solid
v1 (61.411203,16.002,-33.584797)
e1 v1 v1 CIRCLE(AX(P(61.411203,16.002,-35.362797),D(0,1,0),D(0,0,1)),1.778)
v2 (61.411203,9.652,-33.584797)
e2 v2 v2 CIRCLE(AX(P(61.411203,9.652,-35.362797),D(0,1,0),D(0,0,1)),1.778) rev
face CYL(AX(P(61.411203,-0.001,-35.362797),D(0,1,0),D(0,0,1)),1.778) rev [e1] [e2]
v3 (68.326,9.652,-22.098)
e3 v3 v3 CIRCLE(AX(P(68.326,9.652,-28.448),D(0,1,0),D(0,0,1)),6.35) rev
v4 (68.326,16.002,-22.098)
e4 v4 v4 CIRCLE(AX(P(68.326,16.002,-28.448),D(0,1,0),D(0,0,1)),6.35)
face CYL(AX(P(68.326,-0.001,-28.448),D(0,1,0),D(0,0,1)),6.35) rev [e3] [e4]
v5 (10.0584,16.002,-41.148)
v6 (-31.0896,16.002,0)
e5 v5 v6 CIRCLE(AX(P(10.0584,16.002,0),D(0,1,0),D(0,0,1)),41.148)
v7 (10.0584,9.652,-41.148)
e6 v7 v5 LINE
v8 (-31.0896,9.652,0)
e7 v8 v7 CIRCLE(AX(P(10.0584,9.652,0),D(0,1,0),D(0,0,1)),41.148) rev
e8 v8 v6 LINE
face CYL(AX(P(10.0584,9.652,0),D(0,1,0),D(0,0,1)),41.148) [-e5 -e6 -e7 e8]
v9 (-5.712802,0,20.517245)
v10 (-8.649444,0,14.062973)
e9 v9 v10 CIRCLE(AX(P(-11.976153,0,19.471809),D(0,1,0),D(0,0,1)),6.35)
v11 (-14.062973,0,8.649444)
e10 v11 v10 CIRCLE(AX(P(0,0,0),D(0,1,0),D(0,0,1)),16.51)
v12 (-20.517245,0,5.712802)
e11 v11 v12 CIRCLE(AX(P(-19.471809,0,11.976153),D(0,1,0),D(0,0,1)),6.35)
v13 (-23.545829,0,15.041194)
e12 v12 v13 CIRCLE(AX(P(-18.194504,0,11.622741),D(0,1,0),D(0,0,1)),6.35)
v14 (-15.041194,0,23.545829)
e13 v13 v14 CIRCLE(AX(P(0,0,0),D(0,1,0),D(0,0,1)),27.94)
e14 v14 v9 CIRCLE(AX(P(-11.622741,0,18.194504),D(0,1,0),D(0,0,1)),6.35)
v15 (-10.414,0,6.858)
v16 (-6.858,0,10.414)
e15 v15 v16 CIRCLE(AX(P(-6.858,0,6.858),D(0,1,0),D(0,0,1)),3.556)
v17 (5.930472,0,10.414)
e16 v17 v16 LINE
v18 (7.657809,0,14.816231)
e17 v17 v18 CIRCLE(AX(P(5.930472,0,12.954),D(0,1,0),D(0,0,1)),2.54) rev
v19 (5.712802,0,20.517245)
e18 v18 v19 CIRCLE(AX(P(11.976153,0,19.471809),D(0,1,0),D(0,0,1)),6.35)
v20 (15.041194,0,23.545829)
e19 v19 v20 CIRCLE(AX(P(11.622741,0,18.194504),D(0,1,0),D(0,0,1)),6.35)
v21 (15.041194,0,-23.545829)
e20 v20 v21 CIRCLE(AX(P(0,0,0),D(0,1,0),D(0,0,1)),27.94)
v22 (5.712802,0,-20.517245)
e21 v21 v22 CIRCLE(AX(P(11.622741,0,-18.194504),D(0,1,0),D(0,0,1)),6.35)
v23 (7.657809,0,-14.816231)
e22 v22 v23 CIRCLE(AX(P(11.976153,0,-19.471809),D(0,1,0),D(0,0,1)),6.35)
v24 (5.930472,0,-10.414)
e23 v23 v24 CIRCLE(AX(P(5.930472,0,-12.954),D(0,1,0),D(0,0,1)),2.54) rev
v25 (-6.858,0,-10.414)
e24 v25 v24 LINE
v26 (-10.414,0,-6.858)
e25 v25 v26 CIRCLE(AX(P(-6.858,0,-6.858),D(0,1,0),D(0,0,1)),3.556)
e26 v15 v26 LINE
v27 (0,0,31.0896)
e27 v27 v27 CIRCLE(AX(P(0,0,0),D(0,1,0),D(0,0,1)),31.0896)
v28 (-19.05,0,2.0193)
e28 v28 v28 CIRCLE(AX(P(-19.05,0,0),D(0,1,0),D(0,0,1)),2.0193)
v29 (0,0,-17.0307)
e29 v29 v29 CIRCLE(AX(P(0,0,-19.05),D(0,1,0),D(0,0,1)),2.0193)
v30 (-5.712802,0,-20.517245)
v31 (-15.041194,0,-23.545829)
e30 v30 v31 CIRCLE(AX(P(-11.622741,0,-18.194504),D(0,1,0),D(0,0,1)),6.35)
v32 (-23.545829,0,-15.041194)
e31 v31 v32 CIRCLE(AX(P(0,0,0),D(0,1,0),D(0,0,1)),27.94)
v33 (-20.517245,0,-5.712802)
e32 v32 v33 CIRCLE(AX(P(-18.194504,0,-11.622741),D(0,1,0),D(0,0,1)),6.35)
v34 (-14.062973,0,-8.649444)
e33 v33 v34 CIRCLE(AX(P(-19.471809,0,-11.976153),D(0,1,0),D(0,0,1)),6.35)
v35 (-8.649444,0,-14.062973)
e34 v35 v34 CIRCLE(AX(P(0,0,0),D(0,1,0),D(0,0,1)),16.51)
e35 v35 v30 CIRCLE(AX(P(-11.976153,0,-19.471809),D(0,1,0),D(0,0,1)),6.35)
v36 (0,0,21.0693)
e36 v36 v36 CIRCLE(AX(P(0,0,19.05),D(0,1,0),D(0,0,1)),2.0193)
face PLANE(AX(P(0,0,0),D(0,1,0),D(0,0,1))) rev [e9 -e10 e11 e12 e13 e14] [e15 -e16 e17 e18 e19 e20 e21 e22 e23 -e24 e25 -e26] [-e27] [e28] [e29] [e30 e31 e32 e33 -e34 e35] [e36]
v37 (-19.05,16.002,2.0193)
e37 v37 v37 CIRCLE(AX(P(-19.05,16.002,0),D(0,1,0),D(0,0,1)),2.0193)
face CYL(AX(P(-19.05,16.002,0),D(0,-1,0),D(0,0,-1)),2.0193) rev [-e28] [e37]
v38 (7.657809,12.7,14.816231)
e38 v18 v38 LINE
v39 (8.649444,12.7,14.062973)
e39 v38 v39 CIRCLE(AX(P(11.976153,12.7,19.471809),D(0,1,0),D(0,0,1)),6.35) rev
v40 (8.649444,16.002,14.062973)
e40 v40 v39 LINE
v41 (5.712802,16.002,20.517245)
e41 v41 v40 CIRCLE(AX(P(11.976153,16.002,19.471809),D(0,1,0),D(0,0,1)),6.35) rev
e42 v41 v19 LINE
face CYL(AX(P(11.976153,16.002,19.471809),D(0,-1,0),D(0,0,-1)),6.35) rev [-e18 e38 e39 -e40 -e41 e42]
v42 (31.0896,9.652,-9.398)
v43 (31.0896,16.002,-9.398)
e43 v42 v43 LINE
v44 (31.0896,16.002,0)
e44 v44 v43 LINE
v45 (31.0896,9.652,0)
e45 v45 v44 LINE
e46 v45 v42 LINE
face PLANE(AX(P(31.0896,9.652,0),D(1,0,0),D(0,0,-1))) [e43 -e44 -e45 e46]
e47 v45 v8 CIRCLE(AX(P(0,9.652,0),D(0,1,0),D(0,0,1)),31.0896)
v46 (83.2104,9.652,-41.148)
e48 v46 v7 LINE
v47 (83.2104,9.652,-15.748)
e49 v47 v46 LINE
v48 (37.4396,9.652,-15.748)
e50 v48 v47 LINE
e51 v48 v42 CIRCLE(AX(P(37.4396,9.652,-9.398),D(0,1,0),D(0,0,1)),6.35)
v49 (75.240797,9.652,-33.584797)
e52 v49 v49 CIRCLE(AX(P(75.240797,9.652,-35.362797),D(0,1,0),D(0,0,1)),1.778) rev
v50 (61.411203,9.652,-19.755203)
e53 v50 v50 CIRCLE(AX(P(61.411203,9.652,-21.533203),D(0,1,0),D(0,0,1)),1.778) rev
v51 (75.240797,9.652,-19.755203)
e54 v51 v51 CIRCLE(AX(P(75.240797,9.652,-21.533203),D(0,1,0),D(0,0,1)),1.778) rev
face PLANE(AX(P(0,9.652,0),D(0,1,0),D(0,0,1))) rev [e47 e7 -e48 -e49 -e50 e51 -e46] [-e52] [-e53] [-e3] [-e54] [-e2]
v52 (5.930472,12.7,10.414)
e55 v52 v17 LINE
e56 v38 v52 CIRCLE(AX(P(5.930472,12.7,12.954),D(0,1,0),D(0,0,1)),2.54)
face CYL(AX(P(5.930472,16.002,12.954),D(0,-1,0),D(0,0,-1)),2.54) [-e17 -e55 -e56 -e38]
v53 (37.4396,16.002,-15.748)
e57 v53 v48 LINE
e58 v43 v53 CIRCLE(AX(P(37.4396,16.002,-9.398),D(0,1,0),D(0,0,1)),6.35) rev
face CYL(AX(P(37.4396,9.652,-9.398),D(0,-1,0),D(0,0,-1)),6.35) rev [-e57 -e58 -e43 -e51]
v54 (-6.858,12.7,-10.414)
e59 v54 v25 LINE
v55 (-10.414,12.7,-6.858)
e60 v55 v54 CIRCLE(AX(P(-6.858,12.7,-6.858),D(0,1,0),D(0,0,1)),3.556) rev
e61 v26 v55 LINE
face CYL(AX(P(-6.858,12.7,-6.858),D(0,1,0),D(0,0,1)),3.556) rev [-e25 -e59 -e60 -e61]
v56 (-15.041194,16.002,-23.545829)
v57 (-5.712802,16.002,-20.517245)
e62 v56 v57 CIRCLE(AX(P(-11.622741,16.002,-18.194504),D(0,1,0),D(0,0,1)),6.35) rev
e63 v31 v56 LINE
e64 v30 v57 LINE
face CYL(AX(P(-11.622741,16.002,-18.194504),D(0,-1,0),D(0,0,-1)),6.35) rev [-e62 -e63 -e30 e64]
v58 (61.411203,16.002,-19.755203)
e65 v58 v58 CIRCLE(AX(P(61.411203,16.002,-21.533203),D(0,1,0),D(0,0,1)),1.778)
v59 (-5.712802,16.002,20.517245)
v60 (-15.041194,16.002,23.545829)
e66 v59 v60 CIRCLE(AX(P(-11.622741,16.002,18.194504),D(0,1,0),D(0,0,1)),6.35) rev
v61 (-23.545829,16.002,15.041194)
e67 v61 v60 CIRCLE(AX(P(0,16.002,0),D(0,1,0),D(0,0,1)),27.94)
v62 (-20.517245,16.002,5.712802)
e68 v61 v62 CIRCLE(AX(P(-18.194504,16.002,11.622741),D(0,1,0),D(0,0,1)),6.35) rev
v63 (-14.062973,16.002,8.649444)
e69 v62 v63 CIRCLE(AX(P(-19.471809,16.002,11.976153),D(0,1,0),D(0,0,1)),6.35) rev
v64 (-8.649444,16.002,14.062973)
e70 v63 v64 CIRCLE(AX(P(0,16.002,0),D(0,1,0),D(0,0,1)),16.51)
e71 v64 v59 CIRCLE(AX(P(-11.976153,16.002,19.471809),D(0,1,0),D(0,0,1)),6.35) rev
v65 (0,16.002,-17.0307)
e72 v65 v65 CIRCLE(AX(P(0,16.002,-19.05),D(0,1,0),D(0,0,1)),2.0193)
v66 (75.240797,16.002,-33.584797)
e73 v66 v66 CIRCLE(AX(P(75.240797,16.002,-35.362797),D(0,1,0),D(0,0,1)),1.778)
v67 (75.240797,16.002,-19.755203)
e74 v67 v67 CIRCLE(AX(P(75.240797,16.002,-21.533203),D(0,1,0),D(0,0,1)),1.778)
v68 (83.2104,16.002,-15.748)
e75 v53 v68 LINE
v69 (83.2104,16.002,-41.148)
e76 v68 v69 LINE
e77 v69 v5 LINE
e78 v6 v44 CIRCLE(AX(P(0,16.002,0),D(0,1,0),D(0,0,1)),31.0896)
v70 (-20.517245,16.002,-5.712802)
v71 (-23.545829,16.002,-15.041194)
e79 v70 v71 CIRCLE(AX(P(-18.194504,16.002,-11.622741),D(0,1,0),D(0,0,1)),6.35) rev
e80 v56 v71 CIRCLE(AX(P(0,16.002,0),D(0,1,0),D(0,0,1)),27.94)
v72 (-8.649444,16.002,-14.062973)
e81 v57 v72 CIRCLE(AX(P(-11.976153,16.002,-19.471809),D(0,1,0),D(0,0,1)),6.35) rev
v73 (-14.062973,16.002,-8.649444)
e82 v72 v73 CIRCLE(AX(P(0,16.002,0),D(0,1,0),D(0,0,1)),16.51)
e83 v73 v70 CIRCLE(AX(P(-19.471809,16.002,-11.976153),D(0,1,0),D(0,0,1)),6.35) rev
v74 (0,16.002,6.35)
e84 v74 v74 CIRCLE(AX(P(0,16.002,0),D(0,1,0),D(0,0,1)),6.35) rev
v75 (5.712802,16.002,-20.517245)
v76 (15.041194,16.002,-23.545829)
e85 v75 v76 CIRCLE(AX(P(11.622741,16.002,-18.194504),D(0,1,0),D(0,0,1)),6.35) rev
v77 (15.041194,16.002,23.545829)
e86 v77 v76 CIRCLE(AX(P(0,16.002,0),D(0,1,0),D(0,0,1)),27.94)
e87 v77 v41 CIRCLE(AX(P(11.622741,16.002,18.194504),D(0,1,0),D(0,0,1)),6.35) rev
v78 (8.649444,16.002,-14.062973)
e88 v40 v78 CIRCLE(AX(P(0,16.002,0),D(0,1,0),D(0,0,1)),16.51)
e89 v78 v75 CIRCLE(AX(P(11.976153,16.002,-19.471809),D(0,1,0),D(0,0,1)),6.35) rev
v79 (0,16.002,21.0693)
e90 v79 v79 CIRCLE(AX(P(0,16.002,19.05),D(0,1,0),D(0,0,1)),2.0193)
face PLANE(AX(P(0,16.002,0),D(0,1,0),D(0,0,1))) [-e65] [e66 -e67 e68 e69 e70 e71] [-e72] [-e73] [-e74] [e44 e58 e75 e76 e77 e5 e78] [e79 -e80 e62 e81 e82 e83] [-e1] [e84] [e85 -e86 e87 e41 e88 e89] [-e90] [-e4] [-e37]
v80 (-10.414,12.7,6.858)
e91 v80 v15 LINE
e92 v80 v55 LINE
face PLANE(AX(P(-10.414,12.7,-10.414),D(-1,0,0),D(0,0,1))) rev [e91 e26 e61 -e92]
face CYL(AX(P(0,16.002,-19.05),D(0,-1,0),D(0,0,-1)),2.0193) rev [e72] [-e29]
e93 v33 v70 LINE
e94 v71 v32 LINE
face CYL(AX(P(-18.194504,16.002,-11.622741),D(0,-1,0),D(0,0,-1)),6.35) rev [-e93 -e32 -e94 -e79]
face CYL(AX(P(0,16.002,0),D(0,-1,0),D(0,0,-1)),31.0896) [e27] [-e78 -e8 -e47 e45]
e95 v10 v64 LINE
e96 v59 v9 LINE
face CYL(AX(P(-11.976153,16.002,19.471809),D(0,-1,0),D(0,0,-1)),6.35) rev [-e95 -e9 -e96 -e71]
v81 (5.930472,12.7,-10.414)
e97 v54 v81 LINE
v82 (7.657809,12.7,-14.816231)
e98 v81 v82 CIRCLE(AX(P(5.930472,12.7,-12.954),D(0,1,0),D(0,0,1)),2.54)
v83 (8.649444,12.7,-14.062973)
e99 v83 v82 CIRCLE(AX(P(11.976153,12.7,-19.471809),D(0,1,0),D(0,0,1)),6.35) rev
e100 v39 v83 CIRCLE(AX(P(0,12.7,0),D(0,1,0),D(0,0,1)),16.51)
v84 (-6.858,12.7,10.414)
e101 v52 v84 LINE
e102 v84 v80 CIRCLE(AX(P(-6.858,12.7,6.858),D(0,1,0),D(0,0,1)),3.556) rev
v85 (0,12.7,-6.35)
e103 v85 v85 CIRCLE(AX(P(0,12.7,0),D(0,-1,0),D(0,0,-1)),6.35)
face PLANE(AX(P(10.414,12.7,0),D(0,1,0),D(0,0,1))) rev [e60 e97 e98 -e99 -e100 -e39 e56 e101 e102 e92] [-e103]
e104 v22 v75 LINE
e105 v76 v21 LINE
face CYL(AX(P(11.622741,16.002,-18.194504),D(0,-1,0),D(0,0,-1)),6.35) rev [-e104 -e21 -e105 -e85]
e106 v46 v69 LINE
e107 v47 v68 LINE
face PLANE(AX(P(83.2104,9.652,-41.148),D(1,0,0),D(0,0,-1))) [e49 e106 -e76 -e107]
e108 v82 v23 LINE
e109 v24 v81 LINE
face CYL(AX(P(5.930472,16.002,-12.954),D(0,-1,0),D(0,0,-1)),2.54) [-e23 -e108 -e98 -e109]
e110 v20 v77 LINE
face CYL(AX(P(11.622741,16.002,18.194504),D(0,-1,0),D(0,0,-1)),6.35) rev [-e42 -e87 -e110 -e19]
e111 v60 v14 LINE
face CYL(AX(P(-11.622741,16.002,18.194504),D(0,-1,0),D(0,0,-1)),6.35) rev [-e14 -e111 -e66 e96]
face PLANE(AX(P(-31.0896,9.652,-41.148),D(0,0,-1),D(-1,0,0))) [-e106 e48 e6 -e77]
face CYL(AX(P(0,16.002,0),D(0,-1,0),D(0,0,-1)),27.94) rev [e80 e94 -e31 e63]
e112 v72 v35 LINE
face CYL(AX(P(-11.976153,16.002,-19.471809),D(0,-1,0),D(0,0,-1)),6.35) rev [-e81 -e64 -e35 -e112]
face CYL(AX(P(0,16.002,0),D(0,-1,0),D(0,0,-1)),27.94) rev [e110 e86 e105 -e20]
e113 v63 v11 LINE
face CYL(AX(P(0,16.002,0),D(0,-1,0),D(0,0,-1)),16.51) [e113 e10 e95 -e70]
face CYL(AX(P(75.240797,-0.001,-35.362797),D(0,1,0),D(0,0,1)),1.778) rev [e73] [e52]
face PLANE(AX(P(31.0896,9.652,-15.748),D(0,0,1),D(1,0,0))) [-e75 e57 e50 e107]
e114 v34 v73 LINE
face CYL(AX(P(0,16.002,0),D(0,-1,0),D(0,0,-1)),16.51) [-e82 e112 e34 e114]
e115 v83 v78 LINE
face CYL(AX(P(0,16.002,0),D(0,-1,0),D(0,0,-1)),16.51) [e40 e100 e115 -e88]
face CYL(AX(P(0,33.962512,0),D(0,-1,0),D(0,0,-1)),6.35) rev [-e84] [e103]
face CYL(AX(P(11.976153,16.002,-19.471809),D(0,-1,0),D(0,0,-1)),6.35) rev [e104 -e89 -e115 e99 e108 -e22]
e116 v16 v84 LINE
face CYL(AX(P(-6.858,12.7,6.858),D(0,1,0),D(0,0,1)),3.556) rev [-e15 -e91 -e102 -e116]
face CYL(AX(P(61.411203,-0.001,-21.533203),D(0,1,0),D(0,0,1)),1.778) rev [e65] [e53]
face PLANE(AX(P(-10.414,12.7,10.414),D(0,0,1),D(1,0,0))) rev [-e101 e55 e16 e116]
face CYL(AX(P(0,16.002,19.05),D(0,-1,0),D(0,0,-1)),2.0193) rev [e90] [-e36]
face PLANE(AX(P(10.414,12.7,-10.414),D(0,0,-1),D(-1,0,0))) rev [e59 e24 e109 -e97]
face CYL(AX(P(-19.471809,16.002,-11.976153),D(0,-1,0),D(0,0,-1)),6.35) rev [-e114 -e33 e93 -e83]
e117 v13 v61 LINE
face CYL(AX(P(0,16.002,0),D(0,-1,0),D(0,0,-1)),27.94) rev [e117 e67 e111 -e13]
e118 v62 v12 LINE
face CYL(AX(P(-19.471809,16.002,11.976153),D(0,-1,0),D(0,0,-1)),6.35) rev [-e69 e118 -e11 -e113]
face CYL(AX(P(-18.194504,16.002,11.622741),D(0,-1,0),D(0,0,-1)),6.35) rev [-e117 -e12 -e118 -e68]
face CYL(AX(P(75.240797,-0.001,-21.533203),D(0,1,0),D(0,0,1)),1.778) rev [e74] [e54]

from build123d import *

# Parameters (mm, degrees)
SKETCH1_R           = 31.0896
BOSS_EXTRUDE1_DEPTH = 16.002
BOSS_EXTRUDE2_START = -6.35
BOSS_EXTRUDE2_DEPTH = 6.35
FILLET2_R           = 6.35
CUT_EXTRUDE2_REACH  = 96.198
SKETCH4_R           = 1.778
SKETCH4_R_2         = 6.35
SKETCH7_R           = 2.0193
CUT_EXTRUDE4_DEPTH  = 95.197625109
FILLET7_R           = 6.35
FILLET8_R           = 41.148
CUT_EXTRUDE5_DEPTH  = 12.7
FILLET9_R           = 2.54
SKETCH9_R           = 6.35
CUT_EXTRUDE6_DEPTH  = 3.302
FILLET10_R          = 3.556


# Some blends are built 0.0001 mm under size
with BuildPart() as part:
    # Sketch1 → Boss-Extrude1 (new body)
    with BuildSketch(Plane(origin=(0, 0, 0), x_dir=(1, 0, 0), z_dir=(0, 1, 0))):
        with Locations(Location((0, 0, 0), (0, 0, 270))):
            Circle(SKETCH1_R)
    extrude(amount=BOSS_EXTRUDE1_DEPTH)

    # Sketch2 → Boss-Extrude2 (add)
    with BuildSketch(Plane(origin=(0, 16.002, 0), x_dir=(1, 0, 0), z_dir=(0, 1, 0)).offset(BOSS_EXTRUDE2_START)):
        with BuildLine():
            Line((-31.0896, 0), (-31.0896, 41.148))
            Line((-31.0896, 41.148), (83.2104, 41.148))
            Line((83.2104, 41.148), (83.2104, 15.748))
            Line((83.2104, 15.748), (31.0896, 15.748))
            Line((31.0896, 15.748), (31.0896, 0))
            ThreePointArc((31.0896, 0), (0, -31.0896), (-31.0896, 0))
        make_face()
    extrude(amount=BOSS_EXTRUDE2_DEPTH)

    # Fillet2
    fillet2_edges = [part.edges().sort_by_distance(p)[0] for p in [
        (31.0896, 12.827, -15.748),
    ]]
    fillet(fillet2_edges, radius=FILLET2_R)

    # Sketch4 → Cut-Extrude2 (cut, up to next)
    with BuildSketch(Plane(origin=(0, 16.002, 0), x_dir=(1, 0, 0), z_dir=(0, 1, 0)), mode=Mode.PRIVATE) as cut_extrude2_sk1:
        with Locations(Location((61.411202787, 35.362797213, 0), (0, 0, 270))):
            Circle(SKETCH4_R)
    cut_extrude2_tool1 = extrude(cut_extrude2_sk1.sketch, amount=-CUT_EXTRUDE2_REACH, mode=Mode.PRIVATE) & part.part
    # Sketch4 → Cut-Extrude2 (cut, up to next)
    with BuildSketch(Plane(origin=(0, 16.002, 0), x_dir=(1, 0, 0), z_dir=(0, 1, 0)), mode=Mode.PRIVATE) as cut_extrude2_sk2:
        with Locations(Location((75.240797213, 35.362797213, 0), (0, 0, 270))):
            Circle(SKETCH4_R)
    cut_extrude2_tool2 = extrude(cut_extrude2_sk2.sketch, amount=-CUT_EXTRUDE2_REACH, mode=Mode.PRIVATE) & part.part
    # Sketch4 → Cut-Extrude2 (cut, up to next)
    with BuildSketch(Plane(origin=(0, 16.002, 0), x_dir=(1, 0, 0), z_dir=(0, 1, 0)), mode=Mode.PRIVATE) as cut_extrude2_sk3:
        with Locations(Location((75.240797213, 21.533202787, 0), (0, 0, 270))):
            Circle(SKETCH4_R)
    cut_extrude2_tool3 = extrude(cut_extrude2_sk3.sketch, amount=-CUT_EXTRUDE2_REACH, mode=Mode.PRIVATE) & part.part
    # Sketch4 → Cut-Extrude2 (cut, up to next)
    with BuildSketch(Plane(origin=(0, 16.002, 0), x_dir=(1, 0, 0), z_dir=(0, 1, 0)), mode=Mode.PRIVATE) as cut_extrude2_sk4:
        with Locations(Location((68.326, 28.448, 0), (0, 0, 270))):
            Circle(SKETCH4_R_2)
    cut_extrude2_tool4 = extrude(cut_extrude2_sk4.sketch, amount=-CUT_EXTRUDE2_REACH, mode=Mode.PRIVATE) & part.part
    # Sketch4 → Cut-Extrude2 (cut, up to next)
    with BuildSketch(Plane(origin=(0, 16.002, 0), x_dir=(1, 0, 0), z_dir=(0, 1, 0)), mode=Mode.PRIVATE) as cut_extrude2_sk5:
        with Locations(Location((61.411202787, 21.533202787, 0), (0, 0, 270))):
            Circle(SKETCH4_R)
    cut_extrude2_tool5 = extrude(cut_extrude2_sk5.sketch, amount=-CUT_EXTRUDE2_REACH, mode=Mode.PRIVATE) & part.part
    add(cut_extrude2_tool1.solids().sort_by_distance((61.411203, 16.002, -35.362797))[0], mode=Mode.SUBTRACT)
    add(cut_extrude2_tool2.solids().sort_by_distance((75.240797, 16.002, -35.362797))[0], mode=Mode.SUBTRACT)
    add(cut_extrude2_tool3.solids().sort_by_distance((75.240797, 16.002, -21.533203))[0], mode=Mode.SUBTRACT)
    add(cut_extrude2_tool4.solids().sort_by_distance((68.326, 16.002, -28.448))[0], mode=Mode.SUBTRACT)
    add(cut_extrude2_tool5.solids().sort_by_distance((61.411203, 16.002, -21.533203))[0], mode=Mode.SUBTRACT)

    # Sketch7 → Cut-Extrude4 (cut, through all)
    with BuildSketch(Plane(origin=(0, 0, 0), x_dir=(1, 0, 0), z_dir=(0, 1, 0))):
        with BuildLine():
            ThreePointArc((27.94, 0), (22.235278576, 16.918510179), (7.450666667, 26.928259621))
            Line((7.450666667, 26.928259621), (4.402666667, 15.912153412))
            ThreePointArc((4.402666667, 15.912153412), (13.139028249, 9.997301469), (16.51, 0))
            ThreePointArc((16.51, 0), (13.139028249, -9.997301469), (4.402666667, -15.912153412))
            Line((4.402666667, -15.912153412), (7.450666667, -26.928259621))
            ThreePointArc((7.450666667, -26.928259621), (22.235278576, -16.918510179), (27.94, 0))
        make_face()
        with BuildLine():
            Line((-15.912153412, -4.402666667), (-26.928259621, -7.450666667))
            ThreePointArc((-26.928259621, -7.450666667), (-19.756563466, -19.756563466), (-7.450666667, -26.928259621))
            Line((-7.450666667, -26.928259621), (-4.402666667, -15.912153412))
            ThreePointArc((-4.402666667, -15.912153412), (-11.674332957, -11.674332957), (-15.912153412, -4.402666667))
        make_face()
        with BuildLine():
            Line((-4.402666667, 15.912153412), (-7.450666667, 26.928259621))
            ThreePointArc((-7.450666667, 26.928259621), (-19.756563466, 19.756563466), (-26.928259621, 7.450666667))
            Line((-26.928259621, 7.450666667), (-15.912153412, 4.402666667))
            ThreePointArc((-15.912153412, 4.402666667), (-11.674332957, 11.674332957), (-4.402666667, 15.912153412))
        make_face()
        with Locations(Location((-19.05, 0, 0), (0, 0, 270))):
            Circle(SKETCH7_R)
        with Locations(Location((0, -19.05, 0), (0, 0, 270))):
            Circle(SKETCH7_R)
        with Locations(Location((0, 19.05, 0), (0, 0, 270))):
            Circle(SKETCH7_R)
    extrude(amount=CUT_EXTRUDE4_DEPTH, mode=Mode.SUBTRACT)

    # Fillet7
    # the kernel refuses this fillet: 6.35 mm, written as the material it adds along each edge
    with BuildSketch(Plane(origin=(-26.928259621, 0, -7.450666667), x_dir=(0.40702884348062, 0, -0.9134153056385845), z_dir=(0, 1, 0)), Plane(origin=(-7.450666667, 0, 26.928259621), x_dir=(-0.9134153056385848, 0, -0.40702884348061963), z_dir=(0, 1, 0))) as fillet7_piece_1:
        with BuildLine():
            CenterArc((7.365726845, -6.279391075), FILLET7_R, 81.447682412, 107.104635177)
            Line((1.086335771, -7.223715029), (0, 0))
            ThreePointArc((0, 0), (4.1550254, 0.310679271), (8.3100508, 0))
        make_face()
    extrude(amount=16.002)
    with BuildSketch(Plane(origin=(-7.450666667, 0, -26.928259621), x_dir=(0.26666666666666705, 0, 0.9637888196533972), z_dir=(0, 1, 0)), Plane(origin=(7.450666667, 0, 26.928259621), x_dir=(-0.26666666666666733, 0, -0.9637888196533971), z_dir=(0, 1, 0)), Plane(origin=(-26.928259621, 0, 7.450666667), x_dir=(0.9637888196533975, 0, -0.26666666666666644), z_dir=(0, 1, 0))) as fillet7_piece_2:
        with BuildLine():
            CenterArc((7.304942452, -6.35), FILLET7_R, 90, 107.104635177)
            ThreePointArc((1.235807879, -8.217647059), (0.310679271, -4.1550254), (0, 0))
            Line((0, 0), (7.304942452, 0))
        make_face()
    extrude(amount=16.002)
    with BuildSketch(Plane(origin=(-4.402666667, 0, -15.912153412), x_dir=(-0.916852417954672, 0, 0.39922630636103035), z_dir=(0, 1, 0)), Plane(origin=(4.402666667, 0, 15.912153412), x_dir=(0.9168524179546733, 0, -0.39922630636102746), z_dir=(0, 1, 0)), Plane(origin=(-15.912153412, 0, 4.402666667), x_dir=(0.39922630636102946, 0, 0.9168524179546725), z_dir=(0, 1, 0))) as fillet7_piece_3:
        with BuildLine():
            CenterArc((5.522661099, -6.287214109), FILLET7_R, 98.063810107, 73.872379787)
            Line((-0.76455301, -5.396462319), (0, 0))
            ThreePointArc((0, 0), (2.315954654, -0.163243317), (4.631909309, 0))
        make_face()
    extrude(amount=16.002)
    with BuildSketch(Plane(origin=(4.402666667, 0, -15.912153412), x_dir=(0.26666666666666416, 0, -0.9637888196533979), z_dir=(0, 1, 0))) as fillet7_piece_4:
        with BuildLine():
            CenterArc((5.450352912, -6.35), FILLET7_R, 90, 73.872379787)
            ThreePointArc((-0.649745119, -4.586111111), (-0.163243317, -2.315954654), (0, 0))
            Line((0, 0), (5.450352912, 0))
        make_face()
    extrude(amount=16.002)
    with BuildSketch(Plane(origin=(7.450666667, 0, -26.928259621), x_dir=(-0.2666666666666666, 0, 0.9637888196533974), z_dir=(0, 1, 0))) as fillet7_piece_5:
        with BuildLine():
            CenterArc((7.304942452, 6.35), FILLET7_R, 162.895364823, 107.104635177)
            ThreePointArc((1.235807879, 8.217647059), (0.310679271, 4.1550254), (0, 0))
            Line((0, 0), (7.304942452, 0))
        make_face()
    extrude(amount=16.002)
    with BuildSketch(Plane(origin=(-4.402666667, 0, 15.912153412), x_dir=(-0.9168524179546729, 0, -0.3992263063610288), z_dir=(0, 1, 0)), Plane(origin=(-15.912153412, 0, -4.402666667), x_dir=(0.39922630636102996, 0, -0.9168524179546723), z_dir=(0, 1, 0))) as fillet7_piece_6:
        with BuildLine():
            CenterArc((5.522661099, 6.287214109), FILLET7_R, 188.063810107, 73.872379787)
            Line((-0.76455301, 5.396462319), (0, 0))
            ThreePointArc((0, 0), (2.315954654, 0.163243317), (4.631909309, 0))
        make_face()
    extrude(amount=16.002)

    # Fillet8
    fillet8_edges = [part.edges().sort_by_distance(p)[0] for p in [
        (-31.0896, 12.827, -41.148),
    ]]
    fillet(fillet8_edges, radius=FILLET8_R - 0.0001)  # a hair under: the kernel refuses the full size

    # Sketch8 → Cut-Extrude5 (cut)
    with BuildSketch(Plane.XZ):
        with BuildLine():
            Line((-10.414, 10.414), (10.414, 10.414))
            ThreePointArc((10.414, 10.414), (20.828, 0), (10.414, -10.414))
            Line((10.414, -10.414), (-10.414, -10.414))
            Line((-10.414, -10.414), (-10.414, 10.414))
        make_face()
    extrude(amount=-CUT_EXTRUDE5_DEPTH, mode=Mode.SUBTRACT)

    # Fillet9
    # the kernel refuses this fillet: 2.54 mm, written as the material it takes off along each edge
    with BuildSketch(Plane(origin=(13.087195122, 12.7, 10.065059555), x_dir=(-0.7525451578932851, 0, 0.658540648199768), z_dir=(0, -1, 0))) as fillet9_piece_1:
        with BuildLine():
            CenterArc((7.288242174, 2.538935053), FILLET9_R, 131.188669075, 137.152126286)
            Line((5.615548928, 4.450399754), (5.448279603, 4.641546224))
            ThreePointArc((5.448279603, 4.641546224), (2.074222188, 1.688960676), (-0.1125988, 0.227678524))
            Line((-0.1125988, 0.227678524), (-0.049545453, -0.249120951))
            ThreePointArc((-0.049545453, -0.249120951), (6.014734512, -0.336617786), (7.207343199, -0.253893505))
            Line((7.207343199, -0.253893505), (7.214697651, 0))
        make_face()
    extrude(amount=30.736744128, mode=Mode.SUBTRACT)
    with BuildSketch(Plane(origin=(13.087195122, 12.7, -10.065059555), x_dir=(-0.7525451578933744, 0, -0.658540648199666), z_dir=(0, -1, 0))) as fillet9_piece_2:
        with BuildLine():
            CenterArc((7.288242174, -2.538935053), FILLET9_R, 91.659204639, 137.152126286)
            Line((5.615548928, -4.450399754), (5.448279603, -4.641546224))
            ThreePointArc((5.448279603, -4.641546224), (2.074222188, -1.688960676), (-0.1125988, -0.227678524))
            Line((-0.1125988, -0.227678524), (-0.049545453, 0.249120951))
            ThreePointArc((-0.049545453, 0.249120951), (6.014734512, 0.336617786), (7.207343199, 0.253893505))
            Line((7.207343199, 0.253893505), (7.214697651, 0))
        make_face()
    extrude(amount=30.736744128, mode=Mode.SUBTRACT)

    # Sketch9 → Cut-Extrude6 (cut)
    with BuildSketch(Plane.XZ.offset(-12.7)):
        with Locations(Location((0, 0, 0), (0, 0, 270))):
            Circle(SKETCH9_R)
    extrude(amount=-CUT_EXTRUDE6_DEPTH, mode=Mode.SUBTRACT)

    # Fillet10
    fillet10_edges = [part.edges().sort_by_distance(p)[0] for p in [
        (-10.414, 6.35, -10.414),
        (-10.414, 6.35, 10.414),
    ]]
    fillet(fillet10_edges, radius=FILLET10_R)


solid = part.part
